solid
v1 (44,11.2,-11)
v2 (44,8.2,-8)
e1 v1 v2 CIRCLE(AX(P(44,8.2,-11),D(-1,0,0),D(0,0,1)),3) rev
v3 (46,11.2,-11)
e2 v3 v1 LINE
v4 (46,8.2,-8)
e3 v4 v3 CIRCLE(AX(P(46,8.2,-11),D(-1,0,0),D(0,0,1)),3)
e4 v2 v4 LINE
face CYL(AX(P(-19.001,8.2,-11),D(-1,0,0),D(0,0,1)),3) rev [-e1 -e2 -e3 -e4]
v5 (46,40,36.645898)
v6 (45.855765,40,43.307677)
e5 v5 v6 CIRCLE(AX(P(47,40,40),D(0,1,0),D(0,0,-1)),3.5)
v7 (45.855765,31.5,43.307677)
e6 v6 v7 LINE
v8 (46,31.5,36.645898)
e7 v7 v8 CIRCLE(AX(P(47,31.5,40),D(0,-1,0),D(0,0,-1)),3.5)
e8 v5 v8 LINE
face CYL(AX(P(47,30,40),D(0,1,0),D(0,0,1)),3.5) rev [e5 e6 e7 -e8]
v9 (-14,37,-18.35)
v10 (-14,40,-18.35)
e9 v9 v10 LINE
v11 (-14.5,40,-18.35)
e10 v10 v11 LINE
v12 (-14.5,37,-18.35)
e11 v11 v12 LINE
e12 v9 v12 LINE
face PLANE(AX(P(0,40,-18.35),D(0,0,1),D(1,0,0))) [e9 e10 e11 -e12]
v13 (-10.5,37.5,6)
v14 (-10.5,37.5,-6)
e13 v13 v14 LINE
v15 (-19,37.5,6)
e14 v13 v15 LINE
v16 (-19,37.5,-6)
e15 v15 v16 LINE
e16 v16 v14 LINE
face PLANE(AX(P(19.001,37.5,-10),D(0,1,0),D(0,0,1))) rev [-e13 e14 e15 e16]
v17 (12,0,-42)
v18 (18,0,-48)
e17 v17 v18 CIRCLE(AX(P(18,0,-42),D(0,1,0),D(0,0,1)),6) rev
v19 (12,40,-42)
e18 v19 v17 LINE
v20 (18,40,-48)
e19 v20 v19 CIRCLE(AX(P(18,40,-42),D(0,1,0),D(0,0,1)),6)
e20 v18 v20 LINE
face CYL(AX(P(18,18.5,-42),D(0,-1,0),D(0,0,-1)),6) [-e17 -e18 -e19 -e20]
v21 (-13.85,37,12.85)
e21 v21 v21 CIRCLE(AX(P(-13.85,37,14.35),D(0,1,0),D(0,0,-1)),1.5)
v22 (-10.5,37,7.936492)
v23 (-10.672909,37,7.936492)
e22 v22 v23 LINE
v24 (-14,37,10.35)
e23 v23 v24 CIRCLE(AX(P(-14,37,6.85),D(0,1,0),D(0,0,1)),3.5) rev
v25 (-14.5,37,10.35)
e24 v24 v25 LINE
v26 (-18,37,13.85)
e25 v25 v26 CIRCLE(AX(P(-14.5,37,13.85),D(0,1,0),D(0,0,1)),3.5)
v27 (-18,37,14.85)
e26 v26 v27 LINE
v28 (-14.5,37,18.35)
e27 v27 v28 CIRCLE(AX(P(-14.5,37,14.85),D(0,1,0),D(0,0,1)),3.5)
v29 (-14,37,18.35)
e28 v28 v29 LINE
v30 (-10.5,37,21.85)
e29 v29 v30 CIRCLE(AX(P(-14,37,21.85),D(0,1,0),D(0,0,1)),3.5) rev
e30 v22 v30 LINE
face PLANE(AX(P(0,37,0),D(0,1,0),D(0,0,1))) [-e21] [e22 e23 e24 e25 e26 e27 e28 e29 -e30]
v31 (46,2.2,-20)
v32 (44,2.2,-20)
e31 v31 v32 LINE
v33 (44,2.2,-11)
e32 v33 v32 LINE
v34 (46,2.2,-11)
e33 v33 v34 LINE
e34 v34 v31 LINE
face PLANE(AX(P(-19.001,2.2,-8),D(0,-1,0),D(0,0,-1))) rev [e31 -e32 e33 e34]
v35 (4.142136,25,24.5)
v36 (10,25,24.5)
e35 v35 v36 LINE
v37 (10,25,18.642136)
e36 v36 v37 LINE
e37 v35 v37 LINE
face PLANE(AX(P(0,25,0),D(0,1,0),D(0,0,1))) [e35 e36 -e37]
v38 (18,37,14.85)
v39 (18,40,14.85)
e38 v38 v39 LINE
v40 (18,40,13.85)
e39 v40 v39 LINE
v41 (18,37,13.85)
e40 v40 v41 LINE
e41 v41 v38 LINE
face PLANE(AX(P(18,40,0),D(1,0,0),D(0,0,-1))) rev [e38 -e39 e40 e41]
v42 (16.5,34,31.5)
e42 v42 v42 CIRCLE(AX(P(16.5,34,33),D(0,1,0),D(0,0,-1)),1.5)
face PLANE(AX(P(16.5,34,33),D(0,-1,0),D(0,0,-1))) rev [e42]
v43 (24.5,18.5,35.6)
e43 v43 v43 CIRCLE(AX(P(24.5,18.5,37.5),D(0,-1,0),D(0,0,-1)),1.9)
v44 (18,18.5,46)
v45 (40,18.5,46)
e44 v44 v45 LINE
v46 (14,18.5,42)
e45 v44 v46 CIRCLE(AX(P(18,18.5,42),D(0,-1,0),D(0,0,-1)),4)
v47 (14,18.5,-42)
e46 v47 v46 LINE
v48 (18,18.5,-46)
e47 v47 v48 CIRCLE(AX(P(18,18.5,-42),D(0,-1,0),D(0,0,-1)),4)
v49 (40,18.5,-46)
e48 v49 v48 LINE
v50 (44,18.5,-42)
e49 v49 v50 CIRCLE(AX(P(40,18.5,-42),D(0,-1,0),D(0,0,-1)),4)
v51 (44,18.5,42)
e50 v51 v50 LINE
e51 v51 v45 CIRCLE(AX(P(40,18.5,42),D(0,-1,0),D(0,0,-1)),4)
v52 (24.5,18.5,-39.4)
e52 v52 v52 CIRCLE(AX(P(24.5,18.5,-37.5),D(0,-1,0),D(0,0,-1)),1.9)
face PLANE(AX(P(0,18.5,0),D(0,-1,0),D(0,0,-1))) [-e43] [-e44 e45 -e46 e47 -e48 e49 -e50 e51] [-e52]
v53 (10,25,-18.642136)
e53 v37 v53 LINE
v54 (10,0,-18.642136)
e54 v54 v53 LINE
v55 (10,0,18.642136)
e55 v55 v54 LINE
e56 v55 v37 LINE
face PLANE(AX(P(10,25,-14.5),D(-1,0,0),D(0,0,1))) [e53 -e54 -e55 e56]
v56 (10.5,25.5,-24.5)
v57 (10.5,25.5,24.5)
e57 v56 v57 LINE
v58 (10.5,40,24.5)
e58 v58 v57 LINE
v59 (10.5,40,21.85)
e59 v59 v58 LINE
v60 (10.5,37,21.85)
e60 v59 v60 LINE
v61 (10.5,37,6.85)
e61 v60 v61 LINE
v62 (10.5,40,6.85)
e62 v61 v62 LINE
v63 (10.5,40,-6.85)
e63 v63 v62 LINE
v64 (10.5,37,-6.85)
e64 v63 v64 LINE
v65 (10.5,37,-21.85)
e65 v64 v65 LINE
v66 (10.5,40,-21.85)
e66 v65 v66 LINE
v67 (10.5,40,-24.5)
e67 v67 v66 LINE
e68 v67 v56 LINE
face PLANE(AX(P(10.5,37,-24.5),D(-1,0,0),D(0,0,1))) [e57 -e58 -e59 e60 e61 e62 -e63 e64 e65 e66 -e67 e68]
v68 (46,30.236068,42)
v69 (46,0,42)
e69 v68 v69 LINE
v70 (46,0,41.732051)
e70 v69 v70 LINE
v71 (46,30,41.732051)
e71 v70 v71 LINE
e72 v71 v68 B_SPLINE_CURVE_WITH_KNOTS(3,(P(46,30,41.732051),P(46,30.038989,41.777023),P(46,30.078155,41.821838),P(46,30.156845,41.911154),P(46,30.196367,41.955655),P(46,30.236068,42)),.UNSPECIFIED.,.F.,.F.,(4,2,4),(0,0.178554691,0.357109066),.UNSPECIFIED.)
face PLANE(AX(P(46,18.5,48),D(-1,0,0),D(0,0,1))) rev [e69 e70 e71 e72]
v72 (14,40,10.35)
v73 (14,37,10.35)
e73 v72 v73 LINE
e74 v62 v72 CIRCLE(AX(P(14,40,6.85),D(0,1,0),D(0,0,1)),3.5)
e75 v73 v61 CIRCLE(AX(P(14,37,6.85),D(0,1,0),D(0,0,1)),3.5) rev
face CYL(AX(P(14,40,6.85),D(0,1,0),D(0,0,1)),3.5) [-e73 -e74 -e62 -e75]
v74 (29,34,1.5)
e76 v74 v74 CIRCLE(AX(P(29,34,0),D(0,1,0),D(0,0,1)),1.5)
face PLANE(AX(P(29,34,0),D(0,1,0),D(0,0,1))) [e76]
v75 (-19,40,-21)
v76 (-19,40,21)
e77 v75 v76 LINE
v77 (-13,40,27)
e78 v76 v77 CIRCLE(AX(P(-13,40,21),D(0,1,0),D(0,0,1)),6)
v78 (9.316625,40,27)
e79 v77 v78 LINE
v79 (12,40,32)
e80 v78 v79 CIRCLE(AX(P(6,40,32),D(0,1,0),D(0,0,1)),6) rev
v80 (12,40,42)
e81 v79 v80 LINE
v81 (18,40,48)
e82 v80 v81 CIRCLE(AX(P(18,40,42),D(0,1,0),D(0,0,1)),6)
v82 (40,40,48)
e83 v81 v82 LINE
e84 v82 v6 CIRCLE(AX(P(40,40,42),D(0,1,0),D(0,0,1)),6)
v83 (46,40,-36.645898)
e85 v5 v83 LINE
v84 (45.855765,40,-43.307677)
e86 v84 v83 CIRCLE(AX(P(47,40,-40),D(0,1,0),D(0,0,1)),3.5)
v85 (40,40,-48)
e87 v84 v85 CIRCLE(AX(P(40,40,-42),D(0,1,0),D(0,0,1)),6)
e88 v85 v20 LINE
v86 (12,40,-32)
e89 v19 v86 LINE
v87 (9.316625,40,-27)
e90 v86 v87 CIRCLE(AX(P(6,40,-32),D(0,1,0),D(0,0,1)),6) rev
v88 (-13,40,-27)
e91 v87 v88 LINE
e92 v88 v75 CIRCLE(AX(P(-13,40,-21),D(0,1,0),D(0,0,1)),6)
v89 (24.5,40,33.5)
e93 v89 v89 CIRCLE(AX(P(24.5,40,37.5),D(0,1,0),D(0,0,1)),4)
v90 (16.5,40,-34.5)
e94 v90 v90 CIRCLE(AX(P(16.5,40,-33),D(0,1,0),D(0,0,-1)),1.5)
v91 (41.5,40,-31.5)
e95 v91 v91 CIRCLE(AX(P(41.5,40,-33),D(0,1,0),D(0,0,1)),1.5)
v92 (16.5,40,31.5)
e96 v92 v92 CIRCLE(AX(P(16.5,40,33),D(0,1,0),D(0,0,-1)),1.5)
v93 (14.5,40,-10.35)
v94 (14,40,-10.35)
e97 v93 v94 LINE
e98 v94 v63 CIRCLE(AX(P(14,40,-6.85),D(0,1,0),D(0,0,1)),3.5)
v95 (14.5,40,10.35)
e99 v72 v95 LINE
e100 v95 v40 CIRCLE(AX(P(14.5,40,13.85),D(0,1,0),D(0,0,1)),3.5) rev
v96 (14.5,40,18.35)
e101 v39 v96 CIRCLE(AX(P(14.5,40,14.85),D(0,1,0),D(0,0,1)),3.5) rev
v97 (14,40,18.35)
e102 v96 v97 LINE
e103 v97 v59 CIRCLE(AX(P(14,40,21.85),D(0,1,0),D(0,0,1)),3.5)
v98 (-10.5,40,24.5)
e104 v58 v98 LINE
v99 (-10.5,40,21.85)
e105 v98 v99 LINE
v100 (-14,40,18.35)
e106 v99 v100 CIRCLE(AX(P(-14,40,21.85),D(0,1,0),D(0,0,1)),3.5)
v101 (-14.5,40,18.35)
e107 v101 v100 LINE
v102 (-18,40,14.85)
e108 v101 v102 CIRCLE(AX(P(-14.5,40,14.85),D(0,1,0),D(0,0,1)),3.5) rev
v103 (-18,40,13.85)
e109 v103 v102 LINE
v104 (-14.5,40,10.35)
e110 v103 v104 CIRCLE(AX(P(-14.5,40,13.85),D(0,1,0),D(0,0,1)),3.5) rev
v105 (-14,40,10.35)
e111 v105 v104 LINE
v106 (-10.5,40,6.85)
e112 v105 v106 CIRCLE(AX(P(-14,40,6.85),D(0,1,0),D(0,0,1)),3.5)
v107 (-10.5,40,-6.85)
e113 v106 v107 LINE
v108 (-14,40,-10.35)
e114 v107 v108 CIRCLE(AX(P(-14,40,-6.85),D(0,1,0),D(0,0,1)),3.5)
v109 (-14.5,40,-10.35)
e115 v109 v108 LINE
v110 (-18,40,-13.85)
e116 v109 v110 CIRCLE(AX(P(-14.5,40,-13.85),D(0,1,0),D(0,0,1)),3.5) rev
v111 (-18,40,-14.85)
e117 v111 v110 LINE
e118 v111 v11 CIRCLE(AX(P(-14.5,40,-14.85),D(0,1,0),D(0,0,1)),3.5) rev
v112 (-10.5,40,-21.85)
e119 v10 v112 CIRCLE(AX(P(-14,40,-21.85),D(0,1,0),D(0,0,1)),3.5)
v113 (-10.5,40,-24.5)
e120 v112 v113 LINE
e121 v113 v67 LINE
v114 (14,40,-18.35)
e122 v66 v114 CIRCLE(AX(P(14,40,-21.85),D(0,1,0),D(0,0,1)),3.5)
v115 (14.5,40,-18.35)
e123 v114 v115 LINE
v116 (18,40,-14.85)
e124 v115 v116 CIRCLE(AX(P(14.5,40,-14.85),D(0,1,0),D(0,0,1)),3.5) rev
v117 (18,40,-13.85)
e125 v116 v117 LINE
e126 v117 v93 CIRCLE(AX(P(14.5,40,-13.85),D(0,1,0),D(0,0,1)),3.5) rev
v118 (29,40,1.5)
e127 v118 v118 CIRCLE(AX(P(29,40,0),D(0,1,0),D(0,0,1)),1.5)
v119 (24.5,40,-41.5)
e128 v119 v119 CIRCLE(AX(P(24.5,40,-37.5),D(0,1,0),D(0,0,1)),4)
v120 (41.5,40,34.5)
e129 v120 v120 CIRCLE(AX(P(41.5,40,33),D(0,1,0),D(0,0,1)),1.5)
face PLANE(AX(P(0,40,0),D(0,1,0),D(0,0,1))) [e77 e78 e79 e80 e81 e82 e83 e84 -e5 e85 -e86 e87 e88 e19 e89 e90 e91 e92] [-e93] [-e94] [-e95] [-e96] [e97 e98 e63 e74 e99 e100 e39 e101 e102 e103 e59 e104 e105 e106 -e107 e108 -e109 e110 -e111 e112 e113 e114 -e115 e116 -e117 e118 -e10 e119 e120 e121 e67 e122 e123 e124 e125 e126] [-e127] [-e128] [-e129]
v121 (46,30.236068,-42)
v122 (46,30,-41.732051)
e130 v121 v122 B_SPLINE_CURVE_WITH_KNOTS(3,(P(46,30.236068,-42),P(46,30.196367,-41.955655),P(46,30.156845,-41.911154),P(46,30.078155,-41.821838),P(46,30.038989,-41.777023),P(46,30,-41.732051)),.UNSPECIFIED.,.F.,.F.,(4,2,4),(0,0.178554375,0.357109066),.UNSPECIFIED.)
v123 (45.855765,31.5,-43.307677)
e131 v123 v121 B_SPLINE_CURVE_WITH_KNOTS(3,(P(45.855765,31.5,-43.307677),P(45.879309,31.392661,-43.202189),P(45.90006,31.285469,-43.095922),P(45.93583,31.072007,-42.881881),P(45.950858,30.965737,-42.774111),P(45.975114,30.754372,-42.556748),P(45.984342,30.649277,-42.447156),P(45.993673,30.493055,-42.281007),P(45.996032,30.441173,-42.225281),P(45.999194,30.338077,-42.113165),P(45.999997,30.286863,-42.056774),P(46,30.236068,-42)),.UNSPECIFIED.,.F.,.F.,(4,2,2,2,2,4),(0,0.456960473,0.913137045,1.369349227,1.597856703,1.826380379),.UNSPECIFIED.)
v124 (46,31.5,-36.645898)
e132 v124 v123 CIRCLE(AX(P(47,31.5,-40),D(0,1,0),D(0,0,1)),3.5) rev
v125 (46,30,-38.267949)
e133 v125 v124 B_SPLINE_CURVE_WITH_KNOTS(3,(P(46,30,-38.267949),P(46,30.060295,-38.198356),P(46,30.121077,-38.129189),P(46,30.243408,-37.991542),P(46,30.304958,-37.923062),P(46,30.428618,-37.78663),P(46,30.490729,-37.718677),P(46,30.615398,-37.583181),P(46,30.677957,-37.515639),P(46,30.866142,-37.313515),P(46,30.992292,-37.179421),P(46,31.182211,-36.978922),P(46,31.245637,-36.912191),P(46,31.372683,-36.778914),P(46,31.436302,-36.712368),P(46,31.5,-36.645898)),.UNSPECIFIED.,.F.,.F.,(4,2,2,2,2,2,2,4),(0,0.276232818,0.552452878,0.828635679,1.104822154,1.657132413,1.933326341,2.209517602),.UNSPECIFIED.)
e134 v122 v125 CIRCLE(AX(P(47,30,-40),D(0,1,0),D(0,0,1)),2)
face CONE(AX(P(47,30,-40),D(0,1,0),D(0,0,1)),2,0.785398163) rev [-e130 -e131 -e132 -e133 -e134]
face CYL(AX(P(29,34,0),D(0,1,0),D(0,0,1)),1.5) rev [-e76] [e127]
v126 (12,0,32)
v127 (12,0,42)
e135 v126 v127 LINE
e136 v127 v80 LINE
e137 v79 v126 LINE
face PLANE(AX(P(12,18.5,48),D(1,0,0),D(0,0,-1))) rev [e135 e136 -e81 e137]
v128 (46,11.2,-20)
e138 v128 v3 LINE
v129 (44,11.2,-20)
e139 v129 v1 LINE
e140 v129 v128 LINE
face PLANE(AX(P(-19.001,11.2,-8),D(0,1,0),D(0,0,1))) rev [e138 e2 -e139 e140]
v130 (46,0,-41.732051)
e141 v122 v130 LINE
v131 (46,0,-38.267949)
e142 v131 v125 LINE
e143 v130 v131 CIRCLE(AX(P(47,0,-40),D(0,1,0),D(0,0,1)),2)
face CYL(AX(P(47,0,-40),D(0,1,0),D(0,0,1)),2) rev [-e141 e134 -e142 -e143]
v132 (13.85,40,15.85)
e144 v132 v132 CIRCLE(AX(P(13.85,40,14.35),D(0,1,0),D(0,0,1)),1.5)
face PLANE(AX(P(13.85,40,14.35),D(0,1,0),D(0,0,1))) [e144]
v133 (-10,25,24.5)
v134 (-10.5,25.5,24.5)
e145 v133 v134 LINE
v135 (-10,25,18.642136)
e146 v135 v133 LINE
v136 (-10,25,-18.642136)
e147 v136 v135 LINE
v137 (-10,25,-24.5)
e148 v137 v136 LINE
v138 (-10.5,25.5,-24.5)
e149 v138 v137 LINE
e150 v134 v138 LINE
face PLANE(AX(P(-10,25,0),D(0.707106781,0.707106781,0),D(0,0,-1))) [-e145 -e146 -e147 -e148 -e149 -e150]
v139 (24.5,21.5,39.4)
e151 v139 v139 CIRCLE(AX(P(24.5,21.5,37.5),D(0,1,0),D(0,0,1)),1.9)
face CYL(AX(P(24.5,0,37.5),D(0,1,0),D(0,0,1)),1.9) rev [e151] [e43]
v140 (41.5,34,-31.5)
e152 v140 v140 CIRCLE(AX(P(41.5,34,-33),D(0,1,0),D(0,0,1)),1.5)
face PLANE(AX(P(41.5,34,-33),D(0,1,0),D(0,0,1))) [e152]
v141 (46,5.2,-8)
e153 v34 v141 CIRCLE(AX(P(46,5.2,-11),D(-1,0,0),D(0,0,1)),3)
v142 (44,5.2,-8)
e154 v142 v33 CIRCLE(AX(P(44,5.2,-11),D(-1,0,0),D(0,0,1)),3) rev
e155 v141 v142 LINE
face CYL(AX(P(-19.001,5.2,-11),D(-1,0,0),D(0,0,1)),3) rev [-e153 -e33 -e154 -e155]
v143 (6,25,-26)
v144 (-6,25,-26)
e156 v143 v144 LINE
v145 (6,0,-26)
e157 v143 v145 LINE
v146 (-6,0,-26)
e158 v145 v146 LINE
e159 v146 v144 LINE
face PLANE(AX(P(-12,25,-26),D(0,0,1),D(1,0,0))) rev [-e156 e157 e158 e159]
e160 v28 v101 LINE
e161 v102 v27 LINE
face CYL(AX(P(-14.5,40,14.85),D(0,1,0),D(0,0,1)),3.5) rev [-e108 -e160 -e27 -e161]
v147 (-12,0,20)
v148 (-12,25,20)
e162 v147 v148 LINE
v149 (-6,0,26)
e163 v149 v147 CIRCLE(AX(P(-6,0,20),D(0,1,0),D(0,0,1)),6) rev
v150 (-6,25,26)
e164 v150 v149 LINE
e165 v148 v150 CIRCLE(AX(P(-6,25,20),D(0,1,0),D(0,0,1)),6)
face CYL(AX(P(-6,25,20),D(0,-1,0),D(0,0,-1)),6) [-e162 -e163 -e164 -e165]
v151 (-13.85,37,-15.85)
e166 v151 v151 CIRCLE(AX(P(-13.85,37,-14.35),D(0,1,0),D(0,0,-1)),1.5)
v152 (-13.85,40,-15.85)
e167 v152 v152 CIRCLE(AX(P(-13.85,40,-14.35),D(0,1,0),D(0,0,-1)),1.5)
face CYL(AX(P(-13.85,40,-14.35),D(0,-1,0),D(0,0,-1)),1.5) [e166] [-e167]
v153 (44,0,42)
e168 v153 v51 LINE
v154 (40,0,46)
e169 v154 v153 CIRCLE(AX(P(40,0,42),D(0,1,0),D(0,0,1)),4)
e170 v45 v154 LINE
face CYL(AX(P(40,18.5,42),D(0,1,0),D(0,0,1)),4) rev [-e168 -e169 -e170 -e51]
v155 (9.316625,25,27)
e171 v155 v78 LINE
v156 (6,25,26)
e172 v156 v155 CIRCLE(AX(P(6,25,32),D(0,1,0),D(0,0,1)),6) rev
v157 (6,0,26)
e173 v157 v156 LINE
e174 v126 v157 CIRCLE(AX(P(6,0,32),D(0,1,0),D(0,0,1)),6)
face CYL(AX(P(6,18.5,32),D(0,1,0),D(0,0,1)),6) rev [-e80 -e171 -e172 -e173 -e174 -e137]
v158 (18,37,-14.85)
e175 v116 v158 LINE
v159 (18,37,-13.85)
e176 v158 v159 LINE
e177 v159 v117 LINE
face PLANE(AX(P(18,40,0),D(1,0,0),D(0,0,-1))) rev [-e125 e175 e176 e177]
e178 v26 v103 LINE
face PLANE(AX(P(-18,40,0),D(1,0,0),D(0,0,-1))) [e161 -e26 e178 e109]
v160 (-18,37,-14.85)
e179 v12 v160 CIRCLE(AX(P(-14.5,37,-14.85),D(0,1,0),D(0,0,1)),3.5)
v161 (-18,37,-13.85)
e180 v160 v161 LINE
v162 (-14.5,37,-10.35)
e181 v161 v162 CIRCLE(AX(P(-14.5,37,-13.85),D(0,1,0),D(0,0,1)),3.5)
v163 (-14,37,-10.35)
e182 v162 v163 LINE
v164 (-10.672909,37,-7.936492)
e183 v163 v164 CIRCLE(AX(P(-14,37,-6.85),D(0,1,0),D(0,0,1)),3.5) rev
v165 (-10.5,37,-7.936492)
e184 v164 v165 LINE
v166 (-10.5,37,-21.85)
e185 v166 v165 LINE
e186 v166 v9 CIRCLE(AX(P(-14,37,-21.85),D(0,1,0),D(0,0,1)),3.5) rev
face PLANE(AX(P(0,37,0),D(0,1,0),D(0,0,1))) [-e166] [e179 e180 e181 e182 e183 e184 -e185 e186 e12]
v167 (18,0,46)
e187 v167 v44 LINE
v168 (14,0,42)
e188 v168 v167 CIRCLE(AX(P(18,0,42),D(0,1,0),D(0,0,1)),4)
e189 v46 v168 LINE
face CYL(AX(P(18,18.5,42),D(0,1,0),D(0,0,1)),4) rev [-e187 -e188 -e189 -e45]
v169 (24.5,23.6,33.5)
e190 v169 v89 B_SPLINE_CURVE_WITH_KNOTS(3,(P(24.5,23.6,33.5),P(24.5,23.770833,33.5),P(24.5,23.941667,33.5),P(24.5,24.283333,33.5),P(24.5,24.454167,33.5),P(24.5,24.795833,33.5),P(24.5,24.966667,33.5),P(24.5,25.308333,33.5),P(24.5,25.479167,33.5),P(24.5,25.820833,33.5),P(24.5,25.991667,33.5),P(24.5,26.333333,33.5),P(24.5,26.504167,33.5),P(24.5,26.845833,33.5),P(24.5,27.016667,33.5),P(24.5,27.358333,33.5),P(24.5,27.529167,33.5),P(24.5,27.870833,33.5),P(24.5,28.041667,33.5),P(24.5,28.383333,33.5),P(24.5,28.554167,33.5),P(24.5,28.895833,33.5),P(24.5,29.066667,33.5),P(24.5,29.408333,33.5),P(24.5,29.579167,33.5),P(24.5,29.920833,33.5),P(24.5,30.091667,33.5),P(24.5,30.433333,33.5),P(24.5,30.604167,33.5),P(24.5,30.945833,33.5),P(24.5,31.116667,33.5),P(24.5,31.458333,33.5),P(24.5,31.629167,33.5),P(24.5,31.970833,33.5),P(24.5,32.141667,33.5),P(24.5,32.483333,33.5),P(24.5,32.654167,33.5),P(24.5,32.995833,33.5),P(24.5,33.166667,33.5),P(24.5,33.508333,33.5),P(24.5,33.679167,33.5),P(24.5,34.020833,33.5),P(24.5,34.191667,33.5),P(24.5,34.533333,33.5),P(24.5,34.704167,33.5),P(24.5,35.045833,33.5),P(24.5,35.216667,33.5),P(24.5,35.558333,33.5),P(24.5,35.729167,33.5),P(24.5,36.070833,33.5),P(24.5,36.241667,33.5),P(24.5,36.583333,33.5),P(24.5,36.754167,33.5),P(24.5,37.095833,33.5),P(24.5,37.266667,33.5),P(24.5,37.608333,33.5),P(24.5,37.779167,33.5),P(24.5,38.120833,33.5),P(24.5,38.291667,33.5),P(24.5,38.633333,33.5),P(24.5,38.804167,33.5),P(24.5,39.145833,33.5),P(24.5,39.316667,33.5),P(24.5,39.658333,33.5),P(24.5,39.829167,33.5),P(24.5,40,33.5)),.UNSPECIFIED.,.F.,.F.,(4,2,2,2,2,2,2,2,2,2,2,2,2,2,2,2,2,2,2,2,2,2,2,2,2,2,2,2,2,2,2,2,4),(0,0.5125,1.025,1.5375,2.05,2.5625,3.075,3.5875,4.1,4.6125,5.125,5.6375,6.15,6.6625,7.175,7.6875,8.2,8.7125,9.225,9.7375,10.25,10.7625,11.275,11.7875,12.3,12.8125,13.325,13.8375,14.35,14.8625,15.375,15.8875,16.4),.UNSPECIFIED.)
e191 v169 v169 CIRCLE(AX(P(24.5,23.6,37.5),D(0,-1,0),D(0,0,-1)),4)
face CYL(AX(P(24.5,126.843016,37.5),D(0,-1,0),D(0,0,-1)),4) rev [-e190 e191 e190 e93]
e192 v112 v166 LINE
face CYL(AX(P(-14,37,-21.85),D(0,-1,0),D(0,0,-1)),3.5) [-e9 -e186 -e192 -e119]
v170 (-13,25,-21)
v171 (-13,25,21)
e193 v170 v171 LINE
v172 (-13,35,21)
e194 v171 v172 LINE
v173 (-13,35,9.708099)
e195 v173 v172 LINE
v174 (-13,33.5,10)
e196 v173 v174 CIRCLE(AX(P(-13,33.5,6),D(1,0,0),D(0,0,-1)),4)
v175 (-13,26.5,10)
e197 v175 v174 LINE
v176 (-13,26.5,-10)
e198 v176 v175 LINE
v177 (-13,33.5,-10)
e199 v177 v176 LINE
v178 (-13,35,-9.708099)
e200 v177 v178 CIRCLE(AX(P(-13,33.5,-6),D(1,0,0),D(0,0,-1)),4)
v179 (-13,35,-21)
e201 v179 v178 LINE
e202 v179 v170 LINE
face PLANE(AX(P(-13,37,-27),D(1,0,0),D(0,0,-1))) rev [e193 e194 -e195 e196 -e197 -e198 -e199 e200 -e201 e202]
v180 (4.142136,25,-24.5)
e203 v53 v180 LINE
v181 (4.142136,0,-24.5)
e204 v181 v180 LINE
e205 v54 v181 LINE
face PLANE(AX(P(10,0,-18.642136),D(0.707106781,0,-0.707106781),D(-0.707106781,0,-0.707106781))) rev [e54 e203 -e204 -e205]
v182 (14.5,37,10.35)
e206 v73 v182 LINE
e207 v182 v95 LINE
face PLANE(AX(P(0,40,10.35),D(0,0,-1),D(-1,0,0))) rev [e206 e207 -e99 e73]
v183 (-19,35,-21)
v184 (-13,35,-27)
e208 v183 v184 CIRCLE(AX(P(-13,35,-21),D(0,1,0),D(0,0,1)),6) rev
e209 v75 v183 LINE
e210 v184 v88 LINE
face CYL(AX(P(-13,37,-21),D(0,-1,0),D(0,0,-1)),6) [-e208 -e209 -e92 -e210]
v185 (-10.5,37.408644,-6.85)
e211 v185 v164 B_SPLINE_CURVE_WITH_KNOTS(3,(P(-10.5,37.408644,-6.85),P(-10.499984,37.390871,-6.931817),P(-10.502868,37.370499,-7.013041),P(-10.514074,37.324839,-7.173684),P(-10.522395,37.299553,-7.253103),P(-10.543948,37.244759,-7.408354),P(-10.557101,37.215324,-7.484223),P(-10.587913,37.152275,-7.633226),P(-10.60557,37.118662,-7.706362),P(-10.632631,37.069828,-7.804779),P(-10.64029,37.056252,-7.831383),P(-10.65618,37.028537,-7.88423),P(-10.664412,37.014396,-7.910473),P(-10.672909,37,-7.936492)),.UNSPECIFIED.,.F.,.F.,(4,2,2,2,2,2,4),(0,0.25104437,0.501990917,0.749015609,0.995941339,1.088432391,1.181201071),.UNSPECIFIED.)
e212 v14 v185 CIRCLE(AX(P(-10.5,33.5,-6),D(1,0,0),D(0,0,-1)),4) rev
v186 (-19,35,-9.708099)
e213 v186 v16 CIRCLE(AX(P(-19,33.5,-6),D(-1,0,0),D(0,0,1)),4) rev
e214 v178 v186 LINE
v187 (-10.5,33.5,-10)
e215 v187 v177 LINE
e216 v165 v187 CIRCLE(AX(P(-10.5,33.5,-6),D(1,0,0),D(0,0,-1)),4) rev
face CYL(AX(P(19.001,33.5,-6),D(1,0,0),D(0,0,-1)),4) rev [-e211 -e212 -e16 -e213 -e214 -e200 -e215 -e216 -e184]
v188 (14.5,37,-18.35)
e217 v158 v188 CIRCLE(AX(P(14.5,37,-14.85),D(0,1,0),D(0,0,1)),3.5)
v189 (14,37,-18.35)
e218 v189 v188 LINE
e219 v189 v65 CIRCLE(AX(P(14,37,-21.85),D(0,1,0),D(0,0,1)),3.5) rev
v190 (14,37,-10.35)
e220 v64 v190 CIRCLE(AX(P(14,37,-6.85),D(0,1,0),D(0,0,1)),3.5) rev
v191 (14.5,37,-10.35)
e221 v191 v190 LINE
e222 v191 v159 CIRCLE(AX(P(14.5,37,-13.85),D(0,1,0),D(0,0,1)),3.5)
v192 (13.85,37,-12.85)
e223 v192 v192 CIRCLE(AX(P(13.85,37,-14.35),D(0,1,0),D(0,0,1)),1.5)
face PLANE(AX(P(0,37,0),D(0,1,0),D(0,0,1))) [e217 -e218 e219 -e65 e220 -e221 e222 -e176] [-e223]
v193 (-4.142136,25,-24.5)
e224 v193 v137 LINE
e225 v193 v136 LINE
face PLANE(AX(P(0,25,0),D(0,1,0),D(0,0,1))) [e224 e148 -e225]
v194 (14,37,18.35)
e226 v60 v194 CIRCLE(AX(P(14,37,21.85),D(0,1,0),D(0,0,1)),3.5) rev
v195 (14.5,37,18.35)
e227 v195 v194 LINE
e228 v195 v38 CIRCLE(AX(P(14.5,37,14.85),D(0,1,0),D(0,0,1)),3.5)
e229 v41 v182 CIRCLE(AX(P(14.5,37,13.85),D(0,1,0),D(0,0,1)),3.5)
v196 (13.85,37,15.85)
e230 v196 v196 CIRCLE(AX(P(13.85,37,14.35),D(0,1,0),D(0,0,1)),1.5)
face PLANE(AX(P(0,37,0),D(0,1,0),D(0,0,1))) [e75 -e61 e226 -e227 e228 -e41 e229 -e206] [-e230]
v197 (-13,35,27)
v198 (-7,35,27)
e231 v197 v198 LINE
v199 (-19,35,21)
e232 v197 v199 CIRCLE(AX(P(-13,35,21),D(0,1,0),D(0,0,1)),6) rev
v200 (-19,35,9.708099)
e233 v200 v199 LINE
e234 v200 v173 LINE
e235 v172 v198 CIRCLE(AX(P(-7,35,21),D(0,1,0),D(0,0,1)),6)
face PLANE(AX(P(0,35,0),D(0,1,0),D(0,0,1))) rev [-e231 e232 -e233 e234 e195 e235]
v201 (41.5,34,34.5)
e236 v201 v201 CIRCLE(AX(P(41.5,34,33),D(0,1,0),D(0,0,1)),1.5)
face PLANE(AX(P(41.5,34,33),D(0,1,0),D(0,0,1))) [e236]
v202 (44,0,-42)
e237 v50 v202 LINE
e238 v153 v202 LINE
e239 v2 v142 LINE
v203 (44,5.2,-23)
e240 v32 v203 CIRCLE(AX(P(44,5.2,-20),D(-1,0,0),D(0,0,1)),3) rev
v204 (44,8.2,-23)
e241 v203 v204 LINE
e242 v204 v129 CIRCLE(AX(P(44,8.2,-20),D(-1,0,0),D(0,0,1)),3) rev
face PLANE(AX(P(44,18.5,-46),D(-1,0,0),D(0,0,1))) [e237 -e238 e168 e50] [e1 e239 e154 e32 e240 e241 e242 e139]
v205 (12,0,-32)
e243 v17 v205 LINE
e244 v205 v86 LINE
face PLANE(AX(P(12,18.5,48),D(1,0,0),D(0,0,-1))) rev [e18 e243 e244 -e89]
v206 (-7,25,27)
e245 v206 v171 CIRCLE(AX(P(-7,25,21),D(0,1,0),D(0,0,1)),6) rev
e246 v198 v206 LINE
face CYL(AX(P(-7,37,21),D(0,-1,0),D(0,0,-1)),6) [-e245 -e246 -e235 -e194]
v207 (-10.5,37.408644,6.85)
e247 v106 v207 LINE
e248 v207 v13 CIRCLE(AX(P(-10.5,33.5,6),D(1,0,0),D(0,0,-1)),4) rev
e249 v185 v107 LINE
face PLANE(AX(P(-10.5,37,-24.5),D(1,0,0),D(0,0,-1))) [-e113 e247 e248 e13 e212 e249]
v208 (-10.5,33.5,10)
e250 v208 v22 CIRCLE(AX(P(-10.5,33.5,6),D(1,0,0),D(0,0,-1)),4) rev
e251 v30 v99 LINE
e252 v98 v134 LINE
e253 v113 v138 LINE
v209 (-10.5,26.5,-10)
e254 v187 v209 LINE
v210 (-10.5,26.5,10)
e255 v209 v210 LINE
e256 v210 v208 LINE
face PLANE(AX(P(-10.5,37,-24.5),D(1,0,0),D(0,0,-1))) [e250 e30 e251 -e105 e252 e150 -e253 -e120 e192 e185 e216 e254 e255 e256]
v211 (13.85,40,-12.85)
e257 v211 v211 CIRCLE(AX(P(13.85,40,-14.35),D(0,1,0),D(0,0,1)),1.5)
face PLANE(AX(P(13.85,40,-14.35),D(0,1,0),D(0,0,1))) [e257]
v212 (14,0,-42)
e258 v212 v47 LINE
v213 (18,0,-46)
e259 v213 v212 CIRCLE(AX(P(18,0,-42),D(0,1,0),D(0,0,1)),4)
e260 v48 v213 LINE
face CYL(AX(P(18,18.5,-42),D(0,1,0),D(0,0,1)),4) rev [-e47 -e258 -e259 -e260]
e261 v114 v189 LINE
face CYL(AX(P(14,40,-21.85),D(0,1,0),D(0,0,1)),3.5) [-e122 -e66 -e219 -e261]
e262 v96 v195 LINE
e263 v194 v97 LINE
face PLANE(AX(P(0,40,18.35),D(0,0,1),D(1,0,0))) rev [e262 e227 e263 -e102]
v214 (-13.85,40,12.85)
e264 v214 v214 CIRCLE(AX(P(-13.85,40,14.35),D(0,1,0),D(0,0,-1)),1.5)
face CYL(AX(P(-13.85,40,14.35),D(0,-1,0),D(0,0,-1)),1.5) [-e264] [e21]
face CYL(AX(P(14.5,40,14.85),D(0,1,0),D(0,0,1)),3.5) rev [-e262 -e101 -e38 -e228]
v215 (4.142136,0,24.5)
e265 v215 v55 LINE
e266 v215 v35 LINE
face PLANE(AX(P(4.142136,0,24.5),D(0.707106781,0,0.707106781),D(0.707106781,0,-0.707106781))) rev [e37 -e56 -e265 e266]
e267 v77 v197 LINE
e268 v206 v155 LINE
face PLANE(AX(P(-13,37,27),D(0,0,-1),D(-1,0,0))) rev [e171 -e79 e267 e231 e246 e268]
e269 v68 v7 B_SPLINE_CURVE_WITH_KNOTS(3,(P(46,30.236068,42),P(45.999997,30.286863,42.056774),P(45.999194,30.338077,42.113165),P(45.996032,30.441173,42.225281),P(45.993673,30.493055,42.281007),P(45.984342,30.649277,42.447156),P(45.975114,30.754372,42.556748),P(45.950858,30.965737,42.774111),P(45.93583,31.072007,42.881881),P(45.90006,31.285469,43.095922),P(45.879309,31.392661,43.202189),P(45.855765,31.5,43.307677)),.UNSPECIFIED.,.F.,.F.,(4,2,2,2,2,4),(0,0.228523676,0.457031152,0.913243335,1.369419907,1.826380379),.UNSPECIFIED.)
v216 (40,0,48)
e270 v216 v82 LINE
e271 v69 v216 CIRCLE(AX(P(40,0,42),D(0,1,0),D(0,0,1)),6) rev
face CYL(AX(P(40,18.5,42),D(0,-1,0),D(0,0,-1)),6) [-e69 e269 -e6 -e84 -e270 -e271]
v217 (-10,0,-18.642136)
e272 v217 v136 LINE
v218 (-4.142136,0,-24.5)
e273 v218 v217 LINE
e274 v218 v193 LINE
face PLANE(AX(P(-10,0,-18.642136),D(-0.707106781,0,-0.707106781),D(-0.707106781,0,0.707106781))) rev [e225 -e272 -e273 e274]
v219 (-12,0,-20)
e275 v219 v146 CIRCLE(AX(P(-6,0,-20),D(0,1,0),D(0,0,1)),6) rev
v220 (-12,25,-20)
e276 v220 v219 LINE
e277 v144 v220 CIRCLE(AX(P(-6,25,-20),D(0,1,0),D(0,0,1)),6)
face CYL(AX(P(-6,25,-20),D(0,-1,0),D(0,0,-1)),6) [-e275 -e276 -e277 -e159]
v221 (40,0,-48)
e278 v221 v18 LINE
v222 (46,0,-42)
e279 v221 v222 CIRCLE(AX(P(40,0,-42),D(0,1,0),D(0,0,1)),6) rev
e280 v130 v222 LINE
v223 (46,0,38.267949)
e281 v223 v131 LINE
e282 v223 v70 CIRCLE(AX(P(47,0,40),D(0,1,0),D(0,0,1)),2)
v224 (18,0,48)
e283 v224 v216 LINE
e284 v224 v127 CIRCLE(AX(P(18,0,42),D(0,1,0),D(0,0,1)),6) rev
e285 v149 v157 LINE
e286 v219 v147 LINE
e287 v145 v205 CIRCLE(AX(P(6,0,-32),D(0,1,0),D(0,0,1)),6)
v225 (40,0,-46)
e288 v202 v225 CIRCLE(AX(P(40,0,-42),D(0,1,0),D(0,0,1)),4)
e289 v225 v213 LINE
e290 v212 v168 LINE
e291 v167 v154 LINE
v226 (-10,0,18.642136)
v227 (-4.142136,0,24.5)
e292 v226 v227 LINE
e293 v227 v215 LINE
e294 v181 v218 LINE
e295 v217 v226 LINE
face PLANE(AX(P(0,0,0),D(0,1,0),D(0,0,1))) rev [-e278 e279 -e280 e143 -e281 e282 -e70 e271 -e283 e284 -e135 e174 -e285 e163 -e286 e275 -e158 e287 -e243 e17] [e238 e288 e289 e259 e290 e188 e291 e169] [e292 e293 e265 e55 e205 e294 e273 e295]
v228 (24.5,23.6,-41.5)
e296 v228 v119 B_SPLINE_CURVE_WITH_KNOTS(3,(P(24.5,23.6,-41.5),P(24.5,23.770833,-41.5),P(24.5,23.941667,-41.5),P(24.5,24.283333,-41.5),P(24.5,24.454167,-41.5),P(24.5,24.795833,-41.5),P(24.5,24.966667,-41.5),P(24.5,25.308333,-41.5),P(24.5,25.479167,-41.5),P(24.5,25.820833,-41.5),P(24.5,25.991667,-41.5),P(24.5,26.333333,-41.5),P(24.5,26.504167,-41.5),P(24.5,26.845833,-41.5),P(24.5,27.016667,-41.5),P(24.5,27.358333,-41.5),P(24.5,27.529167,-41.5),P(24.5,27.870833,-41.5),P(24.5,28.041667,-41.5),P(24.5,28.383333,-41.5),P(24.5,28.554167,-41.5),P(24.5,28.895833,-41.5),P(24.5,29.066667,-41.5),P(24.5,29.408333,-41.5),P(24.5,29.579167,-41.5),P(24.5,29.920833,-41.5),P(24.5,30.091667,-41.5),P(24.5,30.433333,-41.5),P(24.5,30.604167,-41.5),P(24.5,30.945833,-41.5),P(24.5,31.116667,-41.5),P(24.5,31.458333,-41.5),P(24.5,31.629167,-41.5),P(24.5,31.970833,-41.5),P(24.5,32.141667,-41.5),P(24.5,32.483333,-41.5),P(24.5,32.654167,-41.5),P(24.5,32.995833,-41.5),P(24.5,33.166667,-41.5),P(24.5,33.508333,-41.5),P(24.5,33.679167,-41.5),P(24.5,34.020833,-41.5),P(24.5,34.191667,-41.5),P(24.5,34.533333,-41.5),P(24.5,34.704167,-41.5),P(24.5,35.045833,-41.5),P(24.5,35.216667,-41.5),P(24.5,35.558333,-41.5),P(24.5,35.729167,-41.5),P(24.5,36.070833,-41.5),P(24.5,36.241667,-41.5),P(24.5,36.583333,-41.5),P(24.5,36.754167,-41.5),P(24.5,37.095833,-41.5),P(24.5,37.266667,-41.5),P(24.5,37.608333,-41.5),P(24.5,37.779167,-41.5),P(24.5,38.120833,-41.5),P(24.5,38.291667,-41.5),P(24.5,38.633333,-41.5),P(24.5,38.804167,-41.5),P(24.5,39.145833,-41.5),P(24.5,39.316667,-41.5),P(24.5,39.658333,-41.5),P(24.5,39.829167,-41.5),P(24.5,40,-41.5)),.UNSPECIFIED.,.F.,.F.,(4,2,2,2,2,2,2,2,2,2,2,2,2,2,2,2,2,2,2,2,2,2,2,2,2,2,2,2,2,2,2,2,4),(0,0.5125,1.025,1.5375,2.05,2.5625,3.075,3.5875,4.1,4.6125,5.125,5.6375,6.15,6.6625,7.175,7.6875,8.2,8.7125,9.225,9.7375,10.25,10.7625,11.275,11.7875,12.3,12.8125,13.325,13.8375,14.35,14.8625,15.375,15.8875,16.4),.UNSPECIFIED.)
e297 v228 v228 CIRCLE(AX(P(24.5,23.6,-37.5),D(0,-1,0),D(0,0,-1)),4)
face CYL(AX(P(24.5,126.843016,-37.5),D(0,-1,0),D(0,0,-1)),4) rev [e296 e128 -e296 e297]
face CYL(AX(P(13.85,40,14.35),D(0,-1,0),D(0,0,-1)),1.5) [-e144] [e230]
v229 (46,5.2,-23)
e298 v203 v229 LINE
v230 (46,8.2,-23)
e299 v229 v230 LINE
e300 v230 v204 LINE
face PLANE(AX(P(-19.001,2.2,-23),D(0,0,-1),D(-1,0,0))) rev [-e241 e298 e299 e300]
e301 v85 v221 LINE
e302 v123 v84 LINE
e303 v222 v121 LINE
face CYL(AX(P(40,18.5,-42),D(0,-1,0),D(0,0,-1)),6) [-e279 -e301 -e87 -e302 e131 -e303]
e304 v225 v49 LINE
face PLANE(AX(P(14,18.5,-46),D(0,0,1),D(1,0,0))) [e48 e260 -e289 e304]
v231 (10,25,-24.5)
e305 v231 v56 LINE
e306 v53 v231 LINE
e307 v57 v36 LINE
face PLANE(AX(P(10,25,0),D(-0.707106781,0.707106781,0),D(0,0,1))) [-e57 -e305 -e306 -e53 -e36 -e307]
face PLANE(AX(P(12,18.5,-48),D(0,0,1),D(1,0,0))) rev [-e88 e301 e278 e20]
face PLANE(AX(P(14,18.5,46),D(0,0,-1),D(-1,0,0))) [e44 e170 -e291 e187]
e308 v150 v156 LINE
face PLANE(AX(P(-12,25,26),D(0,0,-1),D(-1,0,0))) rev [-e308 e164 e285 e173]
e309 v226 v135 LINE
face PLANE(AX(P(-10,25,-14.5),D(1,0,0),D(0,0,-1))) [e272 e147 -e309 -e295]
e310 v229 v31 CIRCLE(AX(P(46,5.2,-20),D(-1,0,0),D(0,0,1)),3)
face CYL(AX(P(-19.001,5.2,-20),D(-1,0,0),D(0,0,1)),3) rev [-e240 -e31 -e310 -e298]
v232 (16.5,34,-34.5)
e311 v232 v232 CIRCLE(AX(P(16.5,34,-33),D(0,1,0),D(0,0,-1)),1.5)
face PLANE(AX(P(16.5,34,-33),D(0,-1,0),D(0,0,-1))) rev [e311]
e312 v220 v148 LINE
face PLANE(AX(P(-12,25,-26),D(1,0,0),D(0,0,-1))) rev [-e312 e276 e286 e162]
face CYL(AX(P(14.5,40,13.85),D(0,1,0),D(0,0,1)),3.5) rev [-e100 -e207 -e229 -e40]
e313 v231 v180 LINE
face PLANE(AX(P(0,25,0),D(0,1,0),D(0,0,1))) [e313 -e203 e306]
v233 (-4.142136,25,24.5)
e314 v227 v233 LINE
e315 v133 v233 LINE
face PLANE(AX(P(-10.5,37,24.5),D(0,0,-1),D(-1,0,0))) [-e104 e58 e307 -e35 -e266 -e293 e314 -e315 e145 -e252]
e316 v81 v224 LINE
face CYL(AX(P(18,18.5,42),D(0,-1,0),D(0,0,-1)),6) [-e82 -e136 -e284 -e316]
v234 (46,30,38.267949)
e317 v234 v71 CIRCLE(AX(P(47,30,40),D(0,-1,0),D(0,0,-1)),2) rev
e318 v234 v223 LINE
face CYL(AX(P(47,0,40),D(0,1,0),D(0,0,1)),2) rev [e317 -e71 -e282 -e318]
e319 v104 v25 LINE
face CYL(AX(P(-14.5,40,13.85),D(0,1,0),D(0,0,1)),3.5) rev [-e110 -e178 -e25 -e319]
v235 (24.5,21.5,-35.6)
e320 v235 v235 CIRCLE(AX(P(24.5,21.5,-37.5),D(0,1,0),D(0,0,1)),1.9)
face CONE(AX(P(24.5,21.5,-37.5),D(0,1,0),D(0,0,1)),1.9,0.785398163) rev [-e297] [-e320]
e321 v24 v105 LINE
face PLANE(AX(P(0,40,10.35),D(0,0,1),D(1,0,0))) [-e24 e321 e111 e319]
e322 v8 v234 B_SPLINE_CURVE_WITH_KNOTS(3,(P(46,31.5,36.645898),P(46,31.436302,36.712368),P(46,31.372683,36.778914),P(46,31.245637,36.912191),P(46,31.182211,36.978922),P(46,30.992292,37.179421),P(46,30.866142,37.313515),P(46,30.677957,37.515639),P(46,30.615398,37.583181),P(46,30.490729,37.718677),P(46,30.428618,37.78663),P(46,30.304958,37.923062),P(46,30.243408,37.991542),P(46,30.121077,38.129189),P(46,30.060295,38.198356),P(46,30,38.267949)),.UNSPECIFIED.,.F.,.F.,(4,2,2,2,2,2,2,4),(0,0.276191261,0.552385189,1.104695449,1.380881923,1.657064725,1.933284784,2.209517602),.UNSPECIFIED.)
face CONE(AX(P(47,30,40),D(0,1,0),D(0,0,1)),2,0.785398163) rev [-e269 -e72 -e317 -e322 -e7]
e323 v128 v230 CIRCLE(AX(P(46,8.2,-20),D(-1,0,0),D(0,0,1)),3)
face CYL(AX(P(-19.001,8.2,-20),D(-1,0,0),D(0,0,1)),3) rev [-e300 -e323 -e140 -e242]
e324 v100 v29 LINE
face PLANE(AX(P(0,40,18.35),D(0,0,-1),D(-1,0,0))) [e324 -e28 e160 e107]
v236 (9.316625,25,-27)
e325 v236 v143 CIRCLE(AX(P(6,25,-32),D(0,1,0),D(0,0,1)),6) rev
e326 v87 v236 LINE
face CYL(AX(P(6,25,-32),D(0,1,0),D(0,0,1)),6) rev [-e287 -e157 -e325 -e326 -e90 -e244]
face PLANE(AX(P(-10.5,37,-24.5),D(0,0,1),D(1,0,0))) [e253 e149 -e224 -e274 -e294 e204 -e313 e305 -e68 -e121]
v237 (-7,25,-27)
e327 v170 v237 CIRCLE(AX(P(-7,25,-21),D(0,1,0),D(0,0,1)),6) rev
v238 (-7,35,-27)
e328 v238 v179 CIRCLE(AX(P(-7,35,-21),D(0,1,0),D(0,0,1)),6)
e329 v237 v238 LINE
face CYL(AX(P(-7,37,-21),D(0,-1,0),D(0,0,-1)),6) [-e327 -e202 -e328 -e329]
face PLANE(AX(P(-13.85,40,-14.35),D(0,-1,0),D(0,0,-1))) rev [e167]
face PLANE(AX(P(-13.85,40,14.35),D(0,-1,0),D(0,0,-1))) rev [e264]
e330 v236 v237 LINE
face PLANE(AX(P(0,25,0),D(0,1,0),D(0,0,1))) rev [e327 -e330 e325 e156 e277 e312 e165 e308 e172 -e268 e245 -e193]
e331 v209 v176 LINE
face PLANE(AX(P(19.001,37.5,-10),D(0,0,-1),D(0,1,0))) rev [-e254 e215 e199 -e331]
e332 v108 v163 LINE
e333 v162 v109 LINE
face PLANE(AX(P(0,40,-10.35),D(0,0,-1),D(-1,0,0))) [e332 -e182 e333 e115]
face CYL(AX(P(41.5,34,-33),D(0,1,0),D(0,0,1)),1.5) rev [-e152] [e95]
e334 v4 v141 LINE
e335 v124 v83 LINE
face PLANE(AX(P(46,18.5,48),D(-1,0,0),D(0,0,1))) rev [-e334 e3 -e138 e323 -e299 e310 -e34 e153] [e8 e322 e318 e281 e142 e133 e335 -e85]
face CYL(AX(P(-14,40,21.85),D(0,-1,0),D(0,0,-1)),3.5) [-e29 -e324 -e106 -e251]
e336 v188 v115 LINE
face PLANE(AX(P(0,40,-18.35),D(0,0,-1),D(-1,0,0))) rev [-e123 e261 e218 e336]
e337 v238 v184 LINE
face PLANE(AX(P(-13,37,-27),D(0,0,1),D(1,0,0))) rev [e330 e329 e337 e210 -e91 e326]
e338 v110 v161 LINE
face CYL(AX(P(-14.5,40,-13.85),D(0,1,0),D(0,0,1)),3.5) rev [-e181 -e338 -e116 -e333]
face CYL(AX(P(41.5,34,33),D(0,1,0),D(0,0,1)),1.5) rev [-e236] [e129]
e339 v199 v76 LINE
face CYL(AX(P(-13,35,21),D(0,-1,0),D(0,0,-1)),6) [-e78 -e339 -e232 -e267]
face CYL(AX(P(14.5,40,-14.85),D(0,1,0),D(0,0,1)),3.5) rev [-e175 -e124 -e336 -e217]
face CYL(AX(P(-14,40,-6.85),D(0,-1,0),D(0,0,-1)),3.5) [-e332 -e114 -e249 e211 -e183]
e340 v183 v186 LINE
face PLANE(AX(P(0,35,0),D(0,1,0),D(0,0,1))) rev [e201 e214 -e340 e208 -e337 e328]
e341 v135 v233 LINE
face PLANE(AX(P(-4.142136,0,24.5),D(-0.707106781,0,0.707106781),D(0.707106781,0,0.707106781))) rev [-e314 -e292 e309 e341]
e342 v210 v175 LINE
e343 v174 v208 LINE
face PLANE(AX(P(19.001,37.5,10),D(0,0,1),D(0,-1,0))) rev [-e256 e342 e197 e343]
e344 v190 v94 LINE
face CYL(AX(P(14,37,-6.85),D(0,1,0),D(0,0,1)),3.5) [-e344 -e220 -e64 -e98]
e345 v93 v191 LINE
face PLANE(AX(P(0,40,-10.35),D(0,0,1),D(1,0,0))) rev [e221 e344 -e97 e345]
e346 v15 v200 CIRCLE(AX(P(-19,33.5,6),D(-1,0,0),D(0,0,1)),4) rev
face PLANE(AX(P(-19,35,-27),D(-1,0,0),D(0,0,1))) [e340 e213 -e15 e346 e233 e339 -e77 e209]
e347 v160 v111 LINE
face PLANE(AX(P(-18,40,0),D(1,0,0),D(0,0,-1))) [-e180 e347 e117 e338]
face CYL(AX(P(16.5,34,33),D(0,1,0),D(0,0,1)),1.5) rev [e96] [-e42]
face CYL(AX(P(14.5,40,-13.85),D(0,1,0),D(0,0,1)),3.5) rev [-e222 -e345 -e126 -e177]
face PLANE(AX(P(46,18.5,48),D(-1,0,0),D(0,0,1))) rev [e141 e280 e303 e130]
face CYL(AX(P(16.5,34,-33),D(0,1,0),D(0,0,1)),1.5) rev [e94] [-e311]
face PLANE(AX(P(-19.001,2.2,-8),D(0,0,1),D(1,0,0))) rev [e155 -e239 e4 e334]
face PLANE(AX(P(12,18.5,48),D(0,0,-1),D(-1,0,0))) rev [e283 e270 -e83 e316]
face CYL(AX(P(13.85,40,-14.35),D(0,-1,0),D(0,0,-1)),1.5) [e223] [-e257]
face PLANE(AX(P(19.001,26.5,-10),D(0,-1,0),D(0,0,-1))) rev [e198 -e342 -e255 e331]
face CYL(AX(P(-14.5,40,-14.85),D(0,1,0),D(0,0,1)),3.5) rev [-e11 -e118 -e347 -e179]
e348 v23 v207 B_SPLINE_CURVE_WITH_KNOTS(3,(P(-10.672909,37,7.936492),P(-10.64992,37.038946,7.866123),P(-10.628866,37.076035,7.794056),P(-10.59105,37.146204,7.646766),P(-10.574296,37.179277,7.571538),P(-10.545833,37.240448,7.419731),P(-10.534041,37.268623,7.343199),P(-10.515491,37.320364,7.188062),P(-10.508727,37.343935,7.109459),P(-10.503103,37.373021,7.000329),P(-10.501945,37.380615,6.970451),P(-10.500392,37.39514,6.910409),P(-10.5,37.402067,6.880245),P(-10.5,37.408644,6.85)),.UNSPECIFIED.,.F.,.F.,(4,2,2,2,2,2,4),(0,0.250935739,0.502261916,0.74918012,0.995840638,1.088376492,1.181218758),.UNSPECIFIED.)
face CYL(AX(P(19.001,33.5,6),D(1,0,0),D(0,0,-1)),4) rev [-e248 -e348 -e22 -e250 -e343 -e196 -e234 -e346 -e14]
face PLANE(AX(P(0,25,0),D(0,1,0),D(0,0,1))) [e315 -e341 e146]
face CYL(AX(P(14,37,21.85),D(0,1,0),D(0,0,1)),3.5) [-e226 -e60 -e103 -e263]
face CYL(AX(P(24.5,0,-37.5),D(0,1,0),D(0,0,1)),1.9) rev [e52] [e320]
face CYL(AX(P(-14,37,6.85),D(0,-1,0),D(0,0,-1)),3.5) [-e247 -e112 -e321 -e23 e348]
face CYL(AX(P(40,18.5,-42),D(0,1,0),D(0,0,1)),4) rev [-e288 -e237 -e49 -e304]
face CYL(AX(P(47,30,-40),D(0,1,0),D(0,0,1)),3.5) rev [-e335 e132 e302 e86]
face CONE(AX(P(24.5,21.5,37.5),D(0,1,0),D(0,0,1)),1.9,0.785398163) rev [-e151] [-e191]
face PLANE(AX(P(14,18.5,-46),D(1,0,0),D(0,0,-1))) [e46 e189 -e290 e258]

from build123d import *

# Parameters (mm, degrees)
SZKIC1_W                     = 24
SZKIC1_H                     = 52
DODANIE_WYCI_GNI_CIE1_DEPTH  = 25
SZKIC2_W                     = 26
SZKIC2_H                     = 54
SZKIC2_W_2                   = 21
SZKIC2_H_2                   = 49
DODANIE_WYCI_GNI_CIE2_DEPTH  = 12
SZKIC3_W                     = 38
SZKIC3_H                     = 54
SZKIC3_W_2                   = 21
SZKIC3_H_2                   = 49
DODANIE_WYCI_GNI_CIE3_DEPTH  = 2
SZKIC4_W                     = 38
SZKIC4_H                     = 54
DODANIE_WYCI_GNI_CIE4_DEPTH  = 3
ZAOKR_GLENIE1_R              = 3.5
SZKIC5_R                     = 1.5
DODANIE_WYCI_GNI_CIE9_DEPTH  = 3
WYTNIJ_WYCI_GNI_CIE2_REACH   = 63.425
SZKIC7_W                     = 20
SZKIC7_H                     = 11
SZKIC8_W                     = 34
SZKIC8_H                     = 96
SZKIC8_W_2                   = 30
SZKIC8_H_2                   = 92
DODANIE_WYCI_GNI_CIE5_DEPTH  = 18.5
SZKIC9_W                     = 34
SZKIC9_H                     = 96
DODANIE_WYCI_GNI_CIE6_DEPTH  = 3
SZKIC10_R                    = 1.9
WYTNIJ_WYCI_GNI_CIE3_DEPTH   = 70.873099259
ZAOKR_GLENIE2_R              = 4
SZKIC11_W                    = 34
SZKIC11_H                    = 96
SZKIC11_R                    = 4
DODANIE_WYCI_GNI_CIE7_DEPTH  = 3.5
SZKIC20_R                    = 4
DODANIE_WYCI_GNI_CIE10_DEPTH = 10
SZKIC21_R                    = 4
DODANIE_WYCI_GNI_CIE11_DEPTH = 5
SZKIC13_R                    = 1.5
WYTNIJ_WYCI_GNI_CIE4_DEPTH   = 6
WYTNIJ_WYCI_GNI_CIE5_DEPTH   = 72.028163428
SFAZOWANIE1_SIZE             = 0.5
SFAZOWANIE2_SIZE             = 2.1
ZAOKR_GLENIE3_R              = 6
ZAOKR_GLENIE4_R              = 4
SZKIC18_R                    = 3.5
WYTNIJ_WYCI_GNI_CIE8_DEPTH   = 10
SFAZOWANIE3_SIZE             = 1.5
SZKIC19_R                    = 2
WYTNIJ_WYCI_GNI_CIE9_DEPTH   = 73.938330286
WYTNIJ_WYCI_GNI_CIE10_REACH  = 92.161
SZKIC22_W                    = 15
SZKIC22_H                    = 9
ZAOKR_GLENIE5_R              = 3


with BuildPart() as part:
    # Szkic1 → Dodanie-wyciągnięcie1 (new body)
    with BuildSketch(Plane(origin=(0, 0, 0), x_dir=(1, 0, 0), z_dir=(0, 1, 0))):
        Rectangle(SZKIC1_W, SZKIC1_H)
        with BuildLine():
            Line((10, 14.5), (10, -14.5))
            ThreePointArc((10, -14.5), (0, -24.5), (-10, -14.5))
            Line((-10, -14.5), (-10, 14.5))
            ThreePointArc((-10, 14.5), (0, 24.5), (10, 14.5))
        make_face(mode=Mode.SUBTRACT)
    extrude(amount=DODANIE_WYCI_GNI_CIE1_DEPTH)

    # Szkic2 → Dodanie-wyciągnięcie2 (add)
    with BuildSketch(Plane(origin=(0, 25, 0), x_dir=(1, 0, 0), z_dir=(0, 1, 0))):
        Rectangle(SZKIC2_W, SZKIC2_H)
        Rectangle(SZKIC2_W_2, SZKIC2_H_2, mode=Mode.SUBTRACT)
    extrude(amount=DODANIE_WYCI_GNI_CIE2_DEPTH)

    # Szkic3 → Dodanie-wyciągnięcie3 (add)
    with BuildSketch(Plane(origin=(0, 37, 0), x_dir=(1, 0, 0), z_dir=(0, 1, 0))):
        Rectangle(SZKIC3_W, SZKIC3_H)
        Rectangle(SZKIC3_W_2, SZKIC3_H_2, mode=Mode.SUBTRACT)
    extrude(amount=-DODANIE_WYCI_GNI_CIE3_DEPTH)

    # Szkic4 → Dodanie-wyciągnięcie4 (add)
    with BuildSketch(Plane(origin=(0, 37, 0), x_dir=(1, 0, 0), z_dir=(0, 1, 0))):
        Rectangle(SZKIC4_W, SZKIC4_H)
        Polygon((-10, 24.5), (10, 24.5), (10.5, 24.5), (10.5, 18.35), (18, 18.35), (18, 10.35), (10.5, 10.35), (10.5, -10.35), (18, -10.35), (18, -18.35), (10.5, -18.35), (10.5, -24.5), (10, -24.5), (-10, -24.5), (-10.5, -24.5), (-10.5, -18.35), (-18, -18.35), (-18, -10.35), (-10.5, -10.35), (-10.5, 10.35), (-18, 10.35), (-18, 18.35), (-10.5, 18.35), (-10.5, 24.5), align=None, mode=Mode.SUBTRACT)
    extrude(amount=DODANIE_WYCI_GNI_CIE4_DEPTH)

    # Zaokrąglenie1
    zaokr_glenie1_edges = [part.edges().sort_by_distance(p)[0] for p in [
        (10.5, 38.5, -18.35),
        (18, 38.5, -18.35),
        (18, 38.5, -10.35),
        (10.5, 38.5, -10.35),
        (10.5, 38.5, 10.35),
        (18, 38.5, 10.35),
        (18, 38.5, 18.35),
        (10.5, 38.5, 18.35),
        (-10.5, 38.5, 18.35),
        (-18, 38.5, 18.35),
        (-18, 38.5, 10.35),
        (-10.5, 38.5, 10.35),
        (-10.5, 38.5, -10.35),
        (-18, 38.5, -10.35),
        (-18, 38.5, -18.35),
        (-10.5, 38.5, -18.35),
    ]]
    fillet(zaokr_glenie1_edges, radius=ZAOKR_GLENIE1_R)

    # Szkic5 → Dodanie-wyciągnięcie9 (add)
    with BuildSketch(Plane(origin=(0, 37, 0), x_dir=(1, 0, 0), z_dir=(0, 1, 0))):
        with Locations(Location((13.85, -14.35, 0), (0, 0, 270))):
            Circle(SZKIC5_R)
        with Locations(Location((13.85, 14.35, 0), (0, 0, 270))):
            Circle(SZKIC5_R)
        with Locations(Location((-13.85, -14.35, 0), (0, 0, 90))):
            Circle(SZKIC5_R)
        with Locations(Location((-13.85, 14.35, 0), (0, 0, 90))):
            Circle(SZKIC5_R)
    extrude(amount=DODANIE_WYCI_GNI_CIE9_DEPTH)

    # Szkic7 → Wytnij-wyciągnięcie2 (cut, up to next)
    with BuildSketch(Plane.ZY.offset(19), mode=Mode.PRIVATE) as wytnij_wyci_gni_cie2_sk1:
        with Locations((0, 32)):
            Rectangle(SZKIC7_W, SZKIC7_H)
    wytnij_wyci_gni_cie2_tool1 = extrude(wytnij_wyci_gni_cie2_sk1.sketch, amount=-WYTNIJ_WYCI_GNI_CIE2_REACH, mode=Mode.PRIVATE) & part.part
    add(wytnij_wyci_gni_cie2_tool1.solids().sort_by_distance((-19, 32, 0))[0], mode=Mode.SUBTRACT)

    # Szkic8 → Dodanie-wyciągnięcie5 (add)
    with BuildSketch(Plane(origin=(0, 0, 0), x_dir=(1, 0, 0), z_dir=(0, 1, 0))):
        with Locations((29, 0)):
            Rectangle(SZKIC8_W, SZKIC8_H)
        with Locations((29, 0)):
            Rectangle(SZKIC8_W_2, SZKIC8_H_2, mode=Mode.SUBTRACT)
    extrude(amount=DODANIE_WYCI_GNI_CIE5_DEPTH)

    # Szkic9 → Dodanie-wyciągnięcie6 (add)
    with BuildSketch(Plane(origin=(0, 18.5, 0), x_dir=(1, 0, 0), z_dir=(0, 1, 0))):
        with Locations((29, 0)):
            Rectangle(SZKIC9_W, SZKIC9_H)
    extrude(amount=DODANIE_WYCI_GNI_CIE6_DEPTH)

    # Szkic10 → Wytnij-wyciągnięcie3 (cut, through all)
    with BuildSketch(Plane(origin=(0, 21.5, 0), x_dir=(1, 0, 0), z_dir=(0, 1, 0))):
        with Locations(Location((24.5, 37.5, 0), (0, 0, 270))):
            Circle(SZKIC10_R)
        with Locations(Location((24.5, -37.5, 0), (0, 0, 270))):
            Circle(SZKIC10_R)
    extrude(amount=-WYTNIJ_WYCI_GNI_CIE3_DEPTH, mode=Mode.SUBTRACT)

    # Zaokrąglenie2
    zaokr_glenie2_edges = [part.edges().sort_by_distance(p)[0] for p in [
        (44, 9.25, -46),
        (14, 9.25, -46),
        (14, 9.25, 46),
        (44, 9.25, 46),
    ]]
    fillet(zaokr_glenie2_edges, radius=ZAOKR_GLENIE2_R)

    # Szkic11 → Dodanie-wyciągnięcie7 (add)
    with BuildSketch(Plane(origin=(0, 21.5, 0), x_dir=(1, 0, 0), z_dir=(0, 1, 0))):
        with Locations((29, 0)):
            Rectangle(SZKIC11_W, SZKIC11_H)
        with Locations(Location((24.5, 37.5, 0), (0, 0, 90))):
            Circle(SZKIC11_R, mode=Mode.SUBTRACT)
        with Locations(Location((24.5, -37.5, 0), (0, 0, 90))):
            Circle(SZKIC11_R, mode=Mode.SUBTRACT)
    extrude(amount=DODANIE_WYCI_GNI_CIE7_DEPTH)

    # Szkic20 → Dodanie-wyciągnięcie10 (add)
    with BuildSketch(Plane(origin=(0, 25, 0), x_dir=(1, 0, 0), z_dir=(0, 1, 0))):
        Polygon((12, 27), (13, 27), (13, -27), (12, -27), (12, -48), (46, -48), (46, 48), (12, 48), align=None)
        with Locations(Location((24.5, 37.5, 0), (0, 0, 90))):
            Circle(SZKIC20_R, mode=Mode.SUBTRACT)
        with Locations(Location((24.5, -37.5, 0), (0, 0, 90))):
            Circle(SZKIC20_R, mode=Mode.SUBTRACT)
    extrude(amount=DODANIE_WYCI_GNI_CIE10_DEPTH)

    # Szkic21 → Dodanie-wyciągnięcie11 (add)
    with BuildSketch(Plane(origin=(0, 35, 0), x_dir=(1, 0, 0), z_dir=(0, 1, 0))):
        Polygon((12, 27), (19, 27), (19, -27), (12, -27), (12, -48), (46, -48), (46, 48), (12, 48), align=None)
        with Locations(Location((24.5, 37.5, 0), (0, 0, 90))):
            Circle(SZKIC21_R, mode=Mode.SUBTRACT)
        with Locations(Location((24.5, -37.5, 0), (0, 0, 90))):
            Circle(SZKIC21_R, mode=Mode.SUBTRACT)
    extrude(amount=DODANIE_WYCI_GNI_CIE11_DEPTH)

    # Szkic13 → Wytnij-wyciągnięcie4 (cut)
    with BuildSketch(Plane(origin=(0, 40, 0), x_dir=(1, 0, 0), z_dir=(0, 1, 0))):
        with Locations(Location((41.5, 33, 0), (0, 0, 270))):
            Circle(SZKIC13_R)
        with Locations(Location((41.5, -33, 0), (0, 0, 270))):
            Circle(SZKIC13_R)
        with Locations(Location((16.5, -33, 0), (0, 0, 90))):
            Circle(SZKIC13_R)
        with Locations(Location((16.5, 33, 0), (0, 0, 90))):
            Circle(SZKIC13_R)
        with Locations(Location((29, 0, 0), (0, 0, 270))):
            Circle(SZKIC13_R)
    extrude(amount=-WYTNIJ_WYCI_GNI_CIE4_DEPTH, mode=Mode.SUBTRACT)

    # Szkic14 → Wytnij-wyciągnięcie5 (cut, through all)
    with BuildSketch(Plane(origin=(0, 25, 0), x_dir=(1, 0, 0), z_dir=(0, 1, 0))):
        Polygon((10, 0), (10, 18.642135624), (4.142135624, 24.5), (-4.142135624, 24.5), (-10, 18.642135624), (-10, 0), (-10, -18.642135624), (-4.142135624, -24.5), (4.142135624, -24.5), (10, -18.642135624), align=None)
    extrude(amount=-WYTNIJ_WYCI_GNI_CIE5_DEPTH, mode=Mode.SUBTRACT)

    # Sfazowanie1
    sfazowanie1_edges = [part.edges().sort_by_distance(p)[0] for p in [
        (10.5, 25, 0),
        (-10.5, 25, 0),
    ]]
    chamfer(sfazowanie1_edges, length=SFAZOWANIE1_SIZE - 0.0001)  # a hair under: the kernel refuses the full size

    # Sfazowanie2
    sfazowanie2_edges = [part.edges().sort_by_distance(p)[0] for p in [
        (24.5, 21.5, -33.5),
        (24.5, 21.5, 41.5),
    ]]
    chamfer(sfazowanie2_edges, length=SFAZOWANIE2_SIZE - 0.0001)  # a hair under: the kernel refuses the full size

    # Zaokrąglenie3
    zaokr_glenie3_edges = [part.edges().sort_by_distance(p)[0] for p in [
        (12, 12.5, 26),
        (12, 12.5, -26),
        (-19, 37.5, 27),
        (-19, 37.5, -27),
        (-12, 12.5, -26),
        (-12, 12.5, 26),
        (12, 20, -48),
        (46, 20, -48),
        (46, 20, 48),
        (12, 20, 48),
        (-13, 30, -27),
        (-13, 30, 27),
    ]]
    fillet(zaokr_glenie3_edges, radius=ZAOKR_GLENIE3_R)

    # Zaokrąglenie4
    zaokr_glenie4_edges = [part.edges().sort_by_distance(p)[0] for p in [
        (-15.737192685, 37.5, 10),
        (-15.737192685, 37.5, -10),
    ]]
    fillet(zaokr_glenie4_edges, radius=ZAOKR_GLENIE4_R)

    # Szkic18 → Wytnij-wyciągnięcie8 (cut)
    with BuildSketch(Plane(origin=(0, 40, 0), x_dir=(1, 0, 0), z_dir=(0, 1, 0))):
        with Locations((47, 40)):
            Circle(SZKIC18_R)
        with Locations((47, -40)):
            Circle(SZKIC18_R)
    extrude(amount=-WYTNIJ_WYCI_GNI_CIE8_DEPTH, mode=Mode.SUBTRACT)

    # Sfazowanie3
    sfazowanie3_edges = [part.edges().sort_by_distance(p)[0] for p in [
        (43.500820064, 30, -39.924238715),
        (43.500820064, 30, 39.924238715),
    ]]
    chamfer(sfazowanie3_edges, length=SFAZOWANIE3_SIZE)

    # Szkic19 → Wytnij-wyciągnięcie9 (cut, through all)
    with BuildSketch(Plane(origin=(0, 30, 0), x_dir=(1, 0, 0), z_dir=(0, 1, 0))):
        with Locations((47, -40)):
            Circle(SZKIC19_R)
        with Locations((47, 40)):
            Circle(SZKIC19_R)
    extrude(amount=-WYTNIJ_WYCI_GNI_CIE9_DEPTH, mode=Mode.SUBTRACT)

    # Szkic22 → Wytnij-wyciągnięcie10 (cut, up to next)
    with BuildSketch(Plane(origin=(46, 0, 0), x_dir=(0, 0, -1), z_dir=(1, 0, 0)), mode=Mode.PRIVATE) as wytnij_wyci_gni_cie10_sk1:
        with Locations((15.5, 6.7)):
            Rectangle(SZKIC22_W, SZKIC22_H)
    wytnij_wyci_gni_cie10_tool1 = extrude(wytnij_wyci_gni_cie10_sk1.sketch, amount=-WYTNIJ_WYCI_GNI_CIE10_REACH, mode=Mode.PRIVATE) & part.part
    add(wytnij_wyci_gni_cie10_tool1.solids().sort_by_distance((46, 6.7, -15.5))[0], mode=Mode.SUBTRACT)

    # Zaokrąglenie5
    zaokr_glenie5_edges = [part.edges().sort_by_distance(p)[0] for p in [
        (45, 2.2, -8),
        (45, 11.2, -8),
        (45, 11.2, -23),
        (45, 2.2, -23),
    ]]
    fillet(zaokr_glenie5_edges, radius=ZAOKR_GLENIE5_R)


solid = part.part
